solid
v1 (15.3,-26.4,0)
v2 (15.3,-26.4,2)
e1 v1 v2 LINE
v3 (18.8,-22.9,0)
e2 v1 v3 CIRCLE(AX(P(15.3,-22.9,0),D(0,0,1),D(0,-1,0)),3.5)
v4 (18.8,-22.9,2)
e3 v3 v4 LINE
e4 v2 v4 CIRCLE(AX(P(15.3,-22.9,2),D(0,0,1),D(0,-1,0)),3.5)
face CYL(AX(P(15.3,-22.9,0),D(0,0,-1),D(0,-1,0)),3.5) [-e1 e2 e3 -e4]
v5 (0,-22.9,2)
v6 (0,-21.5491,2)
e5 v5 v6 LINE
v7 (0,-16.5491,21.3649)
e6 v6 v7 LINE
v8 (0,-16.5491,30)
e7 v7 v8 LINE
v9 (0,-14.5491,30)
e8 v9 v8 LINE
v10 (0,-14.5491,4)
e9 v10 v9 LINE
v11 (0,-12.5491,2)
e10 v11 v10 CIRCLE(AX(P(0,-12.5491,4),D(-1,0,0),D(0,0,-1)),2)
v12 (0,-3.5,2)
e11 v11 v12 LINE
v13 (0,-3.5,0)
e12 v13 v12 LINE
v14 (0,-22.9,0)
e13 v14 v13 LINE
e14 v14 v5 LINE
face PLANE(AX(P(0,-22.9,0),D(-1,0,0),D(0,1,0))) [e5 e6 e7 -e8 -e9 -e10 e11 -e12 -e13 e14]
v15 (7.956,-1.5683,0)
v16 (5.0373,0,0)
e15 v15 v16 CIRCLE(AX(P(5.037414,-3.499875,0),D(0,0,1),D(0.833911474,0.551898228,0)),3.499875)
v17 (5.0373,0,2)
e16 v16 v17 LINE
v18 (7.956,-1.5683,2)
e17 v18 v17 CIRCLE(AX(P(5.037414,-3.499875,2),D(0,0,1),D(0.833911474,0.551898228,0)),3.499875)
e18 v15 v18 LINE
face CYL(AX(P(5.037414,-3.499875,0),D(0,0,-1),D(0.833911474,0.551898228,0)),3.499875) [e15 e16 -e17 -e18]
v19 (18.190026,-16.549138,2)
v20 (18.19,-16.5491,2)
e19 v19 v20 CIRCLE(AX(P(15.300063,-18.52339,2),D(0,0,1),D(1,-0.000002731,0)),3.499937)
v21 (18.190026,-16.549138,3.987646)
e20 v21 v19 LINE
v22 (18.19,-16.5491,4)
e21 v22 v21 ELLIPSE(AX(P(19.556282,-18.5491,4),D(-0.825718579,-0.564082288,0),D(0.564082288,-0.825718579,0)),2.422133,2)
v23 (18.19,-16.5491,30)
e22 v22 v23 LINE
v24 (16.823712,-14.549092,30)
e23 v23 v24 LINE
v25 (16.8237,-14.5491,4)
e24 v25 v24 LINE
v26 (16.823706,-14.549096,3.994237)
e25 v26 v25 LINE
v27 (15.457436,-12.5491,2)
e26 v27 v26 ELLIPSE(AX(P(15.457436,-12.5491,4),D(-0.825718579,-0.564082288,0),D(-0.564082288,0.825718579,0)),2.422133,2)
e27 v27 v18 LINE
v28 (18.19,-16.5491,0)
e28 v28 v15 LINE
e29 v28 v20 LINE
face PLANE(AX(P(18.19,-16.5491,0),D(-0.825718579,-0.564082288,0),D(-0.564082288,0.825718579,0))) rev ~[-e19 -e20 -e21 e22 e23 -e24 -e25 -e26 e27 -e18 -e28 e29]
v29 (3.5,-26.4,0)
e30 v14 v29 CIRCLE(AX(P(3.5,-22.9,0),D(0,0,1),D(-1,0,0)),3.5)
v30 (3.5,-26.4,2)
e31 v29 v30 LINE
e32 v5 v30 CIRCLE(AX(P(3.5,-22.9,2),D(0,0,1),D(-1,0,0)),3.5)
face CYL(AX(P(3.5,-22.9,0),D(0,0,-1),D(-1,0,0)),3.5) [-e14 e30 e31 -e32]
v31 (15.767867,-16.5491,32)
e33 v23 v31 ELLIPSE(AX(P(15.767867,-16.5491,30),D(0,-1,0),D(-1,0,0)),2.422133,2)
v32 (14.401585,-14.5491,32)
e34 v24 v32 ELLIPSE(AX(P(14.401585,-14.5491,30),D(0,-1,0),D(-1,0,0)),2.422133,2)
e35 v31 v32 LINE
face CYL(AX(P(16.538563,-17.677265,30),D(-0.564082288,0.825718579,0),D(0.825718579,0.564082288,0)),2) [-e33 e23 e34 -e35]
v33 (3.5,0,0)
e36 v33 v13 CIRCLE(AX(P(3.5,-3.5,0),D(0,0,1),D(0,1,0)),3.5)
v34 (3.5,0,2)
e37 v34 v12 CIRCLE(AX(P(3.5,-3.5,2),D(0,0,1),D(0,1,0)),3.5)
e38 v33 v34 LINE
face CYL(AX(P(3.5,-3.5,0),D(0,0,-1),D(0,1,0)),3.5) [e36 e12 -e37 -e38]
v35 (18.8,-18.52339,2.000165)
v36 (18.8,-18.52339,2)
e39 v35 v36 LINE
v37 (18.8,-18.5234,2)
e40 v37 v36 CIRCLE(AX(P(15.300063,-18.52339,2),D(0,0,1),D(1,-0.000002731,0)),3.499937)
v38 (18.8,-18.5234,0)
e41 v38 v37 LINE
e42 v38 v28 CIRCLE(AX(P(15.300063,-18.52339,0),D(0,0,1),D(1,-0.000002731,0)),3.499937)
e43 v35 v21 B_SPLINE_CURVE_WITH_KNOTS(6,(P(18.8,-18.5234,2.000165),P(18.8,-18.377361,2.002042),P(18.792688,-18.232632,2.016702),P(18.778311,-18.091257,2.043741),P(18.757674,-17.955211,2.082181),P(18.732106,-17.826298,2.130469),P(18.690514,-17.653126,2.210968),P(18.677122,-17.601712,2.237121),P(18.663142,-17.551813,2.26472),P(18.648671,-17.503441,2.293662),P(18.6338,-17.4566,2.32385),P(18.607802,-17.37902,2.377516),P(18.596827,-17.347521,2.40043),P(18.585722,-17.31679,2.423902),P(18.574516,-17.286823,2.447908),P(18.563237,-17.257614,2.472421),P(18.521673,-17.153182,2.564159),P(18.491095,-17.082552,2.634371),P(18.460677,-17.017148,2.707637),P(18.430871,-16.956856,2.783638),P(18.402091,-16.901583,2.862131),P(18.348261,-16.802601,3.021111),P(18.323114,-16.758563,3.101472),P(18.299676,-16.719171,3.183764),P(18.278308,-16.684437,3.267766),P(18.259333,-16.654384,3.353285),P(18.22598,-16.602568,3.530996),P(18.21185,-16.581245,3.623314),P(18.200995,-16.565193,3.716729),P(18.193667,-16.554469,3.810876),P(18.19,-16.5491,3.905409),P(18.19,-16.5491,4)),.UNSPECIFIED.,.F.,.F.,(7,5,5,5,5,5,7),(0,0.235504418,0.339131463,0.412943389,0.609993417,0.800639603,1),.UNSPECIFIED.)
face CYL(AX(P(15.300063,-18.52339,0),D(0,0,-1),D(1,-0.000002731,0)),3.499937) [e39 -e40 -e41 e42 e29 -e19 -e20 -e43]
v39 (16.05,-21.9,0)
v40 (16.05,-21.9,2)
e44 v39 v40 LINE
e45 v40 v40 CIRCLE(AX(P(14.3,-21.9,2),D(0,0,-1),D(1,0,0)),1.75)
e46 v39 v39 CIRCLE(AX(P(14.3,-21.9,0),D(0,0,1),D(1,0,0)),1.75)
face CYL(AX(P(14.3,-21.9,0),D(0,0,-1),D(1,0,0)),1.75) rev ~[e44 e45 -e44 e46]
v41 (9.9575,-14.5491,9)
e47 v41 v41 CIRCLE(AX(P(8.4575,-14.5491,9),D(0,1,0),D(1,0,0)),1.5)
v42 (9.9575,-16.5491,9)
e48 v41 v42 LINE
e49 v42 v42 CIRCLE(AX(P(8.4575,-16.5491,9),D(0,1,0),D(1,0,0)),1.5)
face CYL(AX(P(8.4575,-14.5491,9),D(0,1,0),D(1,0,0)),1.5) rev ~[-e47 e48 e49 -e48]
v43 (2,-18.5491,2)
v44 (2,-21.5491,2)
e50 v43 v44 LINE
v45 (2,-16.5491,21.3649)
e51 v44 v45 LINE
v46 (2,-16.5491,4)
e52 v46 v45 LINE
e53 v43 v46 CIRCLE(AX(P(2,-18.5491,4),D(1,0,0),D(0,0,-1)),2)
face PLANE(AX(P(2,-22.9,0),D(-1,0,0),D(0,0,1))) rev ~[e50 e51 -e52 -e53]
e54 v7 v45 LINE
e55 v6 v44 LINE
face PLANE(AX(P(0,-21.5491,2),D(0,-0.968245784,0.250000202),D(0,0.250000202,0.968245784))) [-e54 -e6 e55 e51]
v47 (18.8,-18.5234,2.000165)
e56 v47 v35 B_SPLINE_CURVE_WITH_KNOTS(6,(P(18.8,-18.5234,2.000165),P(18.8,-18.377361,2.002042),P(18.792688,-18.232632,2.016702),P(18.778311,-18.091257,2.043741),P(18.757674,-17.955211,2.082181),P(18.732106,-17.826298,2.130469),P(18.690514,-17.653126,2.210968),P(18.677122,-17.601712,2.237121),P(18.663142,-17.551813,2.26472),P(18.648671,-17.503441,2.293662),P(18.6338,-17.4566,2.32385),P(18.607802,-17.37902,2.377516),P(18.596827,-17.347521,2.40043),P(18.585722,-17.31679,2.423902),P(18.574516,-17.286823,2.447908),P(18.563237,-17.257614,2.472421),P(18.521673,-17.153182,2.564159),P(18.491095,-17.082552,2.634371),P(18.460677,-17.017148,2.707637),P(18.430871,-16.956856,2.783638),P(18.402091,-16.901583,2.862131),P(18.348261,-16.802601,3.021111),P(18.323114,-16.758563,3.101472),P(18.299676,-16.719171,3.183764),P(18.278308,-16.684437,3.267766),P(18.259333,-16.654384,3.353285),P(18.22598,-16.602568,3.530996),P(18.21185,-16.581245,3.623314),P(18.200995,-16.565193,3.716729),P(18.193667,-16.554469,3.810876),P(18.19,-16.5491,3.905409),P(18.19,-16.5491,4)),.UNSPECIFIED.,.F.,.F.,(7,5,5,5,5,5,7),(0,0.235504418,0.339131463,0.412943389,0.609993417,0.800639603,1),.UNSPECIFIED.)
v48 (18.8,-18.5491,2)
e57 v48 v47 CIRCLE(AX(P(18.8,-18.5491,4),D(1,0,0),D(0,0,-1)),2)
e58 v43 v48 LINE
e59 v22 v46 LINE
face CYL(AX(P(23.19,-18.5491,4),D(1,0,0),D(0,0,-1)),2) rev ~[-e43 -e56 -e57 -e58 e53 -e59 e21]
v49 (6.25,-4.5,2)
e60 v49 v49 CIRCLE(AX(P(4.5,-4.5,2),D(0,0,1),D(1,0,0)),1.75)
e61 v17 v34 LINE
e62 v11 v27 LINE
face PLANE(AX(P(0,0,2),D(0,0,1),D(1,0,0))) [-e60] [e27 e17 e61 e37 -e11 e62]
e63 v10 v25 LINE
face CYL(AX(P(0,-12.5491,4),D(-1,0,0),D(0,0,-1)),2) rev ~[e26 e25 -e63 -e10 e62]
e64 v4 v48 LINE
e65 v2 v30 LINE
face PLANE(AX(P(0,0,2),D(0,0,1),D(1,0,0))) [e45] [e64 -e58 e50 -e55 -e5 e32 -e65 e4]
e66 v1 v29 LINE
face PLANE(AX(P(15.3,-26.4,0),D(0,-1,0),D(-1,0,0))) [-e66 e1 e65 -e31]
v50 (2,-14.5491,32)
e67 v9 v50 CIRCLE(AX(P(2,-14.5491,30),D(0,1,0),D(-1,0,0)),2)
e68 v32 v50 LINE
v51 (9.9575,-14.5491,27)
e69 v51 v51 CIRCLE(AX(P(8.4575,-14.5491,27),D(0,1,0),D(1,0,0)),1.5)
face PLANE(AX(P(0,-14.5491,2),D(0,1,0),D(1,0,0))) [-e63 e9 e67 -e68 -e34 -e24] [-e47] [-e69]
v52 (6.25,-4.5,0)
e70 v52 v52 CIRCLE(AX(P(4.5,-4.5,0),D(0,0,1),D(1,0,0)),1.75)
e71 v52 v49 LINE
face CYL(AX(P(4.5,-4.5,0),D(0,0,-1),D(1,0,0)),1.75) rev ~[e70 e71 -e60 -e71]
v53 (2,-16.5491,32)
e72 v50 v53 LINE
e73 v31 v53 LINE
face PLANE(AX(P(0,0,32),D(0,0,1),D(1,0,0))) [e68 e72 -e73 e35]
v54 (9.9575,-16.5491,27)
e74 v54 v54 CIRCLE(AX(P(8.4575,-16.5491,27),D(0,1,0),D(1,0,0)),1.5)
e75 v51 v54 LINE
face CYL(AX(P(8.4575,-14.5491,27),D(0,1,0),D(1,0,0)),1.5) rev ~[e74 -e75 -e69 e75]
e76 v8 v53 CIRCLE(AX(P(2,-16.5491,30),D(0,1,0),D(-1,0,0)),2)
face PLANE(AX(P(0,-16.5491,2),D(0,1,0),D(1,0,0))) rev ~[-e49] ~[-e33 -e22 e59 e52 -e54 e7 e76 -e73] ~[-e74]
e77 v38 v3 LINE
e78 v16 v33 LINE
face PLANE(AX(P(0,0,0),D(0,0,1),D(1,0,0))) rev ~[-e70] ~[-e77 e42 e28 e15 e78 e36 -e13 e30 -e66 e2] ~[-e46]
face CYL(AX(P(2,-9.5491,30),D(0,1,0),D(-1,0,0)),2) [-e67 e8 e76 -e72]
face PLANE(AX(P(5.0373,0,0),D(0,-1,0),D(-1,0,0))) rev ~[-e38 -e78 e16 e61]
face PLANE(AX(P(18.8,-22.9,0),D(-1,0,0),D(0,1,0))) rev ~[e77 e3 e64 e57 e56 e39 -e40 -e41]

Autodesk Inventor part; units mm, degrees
ref_plane "YZ Plane" through (0, 0, 0) normal (1, 0, 0) x (0, 1, 0)
ref_plane "XZ Plane" through (0, 0, 0) normal (0, 1, 0) x (-1, 0, 0)
ref_plane "XY Plane" through (0, 0, 0) normal (0, 0, 1) x (1, 0, 0)
sketch "Sketch1" plane through (0, 0, 0) normal (0, 0, 1) x (1, 0, 0)
  circle A0 centre (4.5, -4.5) radius 1.75
  circle A1 centre (14.3, -21.9) radius 1.75
  line L0 (15.3, -26.4) -> (3.5, -26.4)
  line L1 (0, -22.9) -> (0, -3.5)
  line L2 (18.8, -22.9) -> (18.8, -19.7088)
  line L3 (5.0373, 0) -> (3.5, 0)
  arc A2 (3.5, 0) -> (0, -3.5) centre (3.5, -3.5) ccw
  arc A3 (7.956, -1.5683) -> (5.0373, 0) centre (5.0373, -3.5) ccw
  arc A4 (15.3, -26.4) -> (18.8, -22.9) centre (15.3, -22.9) ccw
  arc A5 (0, -22.9) -> (3.5, -26.4) centre (3.5, -22.9) ccw
  line L4 (14.3, -21.9) -> (14.3, -17.4)
  line L5 (18.8, -19.7088) -> (18.8, -18.5234)
  line L6 (18.19, -16.5491) -> (7.956, -1.5683)
  arc A6 (18.8, -18.5234) -> (18.19, -16.5491) centre (15.3, -18.5234) ccw
  point P0 (0, 0)
  point P1 (6.9181, 0)
  point P2 (4.2687, 0)
  dimension "d0" = 3.5
  dimension "d1" = 3.5
  dimension "d34" = 4.5
  dimension "d35" = 4.5
  dimension "d38" = 6.9181
  dimension "d39" = 3.5
  dimension "d46" = 3.5
  dimension "d66" = 9.8
  dimension "d67" = 17.4
  dimension "d68" = 19.97
  dimension "d69" = 4.5
  dimension "d70" = 4.5
  dimension "d71" = 4.5
  dimension "d72" = 3.5
extrude "Extrusion5" add sketch "Sketch1" along normal blind 2
sketch "Sketch5" plane through (0, 0, 2) normal (0, 0, 1) x (1, 0, 0)
  line L0 (0, -3.5) -> (0, -22.9) projected
  line L1 (0, -14.5491) -> (16.1836, -14.5491)
  line L2 (0, -14.5491) -> (0, -16.5491)
  line L3 (0, -16.5491) -> (17.3511, -16.5491)
  line L4 (0, -14.5491) -> (16.8237, -14.5491)
  line L5 (18.19, -16.5491) -> (7.956, -1.5683) projected
  line L6 (18.19, -16.5491) -> (0, -16.5491)
  line L7 (0, -3.5) -> (0, -22.9) projected
  line L8 (18.19, -16.5491) -> (16.8237, -14.5491)
  point P0 (0, 0)
  point P1 (0, -16.5491)
  dimension "d42" = 2
  dimension "d76" = 0
extrude "Extrusion6" add sketch "Sketch5" along normal blind 30
fillet "Fillet2" radius 2 3 edges at (0, -15.5491, 32) (8.4119, -14.5491, 2) (9.095, -16.5491, 2)
sketch "Sketch6" plane through (0, -22.9, 0) normal (-1, 0, 0) x (0, 0, 1)
  line L0 (4, 6.3509) -> (30, 6.3509) projected
  line L1 (2, 2.75) -> (2, -0.75) projected
  line L2 (2, 6.3509) -> (2, 1.3509)
  line L3 (2, 6.3509) -> (2, 1.3509)
  line L4 (2, 1.3509) -> (21.3649, 6.3509)
  line L5 (21.3649, 6.3509) -> (2, 6.3509)
  point P0 (0, 22.9)
  point P1 (2, 2.75)
  dimension "d73" = 5
  dimension "d74" = 5
  dimension "d75" = 20
extrude "Extrusion7" add sketch "Sketch6" against normal blind 2
sketch "Sketch7" plane through (0, -14.5491, 4) normal (0, 1, 0) x (1, 0, 0)
  circle A0 centre (8.4575, -5) radius 1.5
  circle A1 centre (8.4575, -23) radius 1.5
  line L0 (0, 0) -> (0, -26) projected
  line L1 (16.8237, -28) -> (2, -28) projected
  line L2 (0, 0) -> (16.8237, 0) projected
  line L3 (16.8237, 0) -> (16.8237, -28) projected
  point P0 (0, 4)
  point P1 (13.7853, -28)
  dimension "d54" = 3
  dimension "d55" = 3
  dimension "d56" = 18
  dimension "d58" = 8.4575
  dimension "d59" = 8.4575
  dimension "d62" = 5
  dimension "d63" = 5
  dimension "d78" = 16.8237
extrude "Extrusion8" cut sketch "Sketch7" against normal blind 2
fillet "Fillet3" radius 2 1 edges at (17.5069, -15.5491, 32)
properties part number "BLTouch Mount"
